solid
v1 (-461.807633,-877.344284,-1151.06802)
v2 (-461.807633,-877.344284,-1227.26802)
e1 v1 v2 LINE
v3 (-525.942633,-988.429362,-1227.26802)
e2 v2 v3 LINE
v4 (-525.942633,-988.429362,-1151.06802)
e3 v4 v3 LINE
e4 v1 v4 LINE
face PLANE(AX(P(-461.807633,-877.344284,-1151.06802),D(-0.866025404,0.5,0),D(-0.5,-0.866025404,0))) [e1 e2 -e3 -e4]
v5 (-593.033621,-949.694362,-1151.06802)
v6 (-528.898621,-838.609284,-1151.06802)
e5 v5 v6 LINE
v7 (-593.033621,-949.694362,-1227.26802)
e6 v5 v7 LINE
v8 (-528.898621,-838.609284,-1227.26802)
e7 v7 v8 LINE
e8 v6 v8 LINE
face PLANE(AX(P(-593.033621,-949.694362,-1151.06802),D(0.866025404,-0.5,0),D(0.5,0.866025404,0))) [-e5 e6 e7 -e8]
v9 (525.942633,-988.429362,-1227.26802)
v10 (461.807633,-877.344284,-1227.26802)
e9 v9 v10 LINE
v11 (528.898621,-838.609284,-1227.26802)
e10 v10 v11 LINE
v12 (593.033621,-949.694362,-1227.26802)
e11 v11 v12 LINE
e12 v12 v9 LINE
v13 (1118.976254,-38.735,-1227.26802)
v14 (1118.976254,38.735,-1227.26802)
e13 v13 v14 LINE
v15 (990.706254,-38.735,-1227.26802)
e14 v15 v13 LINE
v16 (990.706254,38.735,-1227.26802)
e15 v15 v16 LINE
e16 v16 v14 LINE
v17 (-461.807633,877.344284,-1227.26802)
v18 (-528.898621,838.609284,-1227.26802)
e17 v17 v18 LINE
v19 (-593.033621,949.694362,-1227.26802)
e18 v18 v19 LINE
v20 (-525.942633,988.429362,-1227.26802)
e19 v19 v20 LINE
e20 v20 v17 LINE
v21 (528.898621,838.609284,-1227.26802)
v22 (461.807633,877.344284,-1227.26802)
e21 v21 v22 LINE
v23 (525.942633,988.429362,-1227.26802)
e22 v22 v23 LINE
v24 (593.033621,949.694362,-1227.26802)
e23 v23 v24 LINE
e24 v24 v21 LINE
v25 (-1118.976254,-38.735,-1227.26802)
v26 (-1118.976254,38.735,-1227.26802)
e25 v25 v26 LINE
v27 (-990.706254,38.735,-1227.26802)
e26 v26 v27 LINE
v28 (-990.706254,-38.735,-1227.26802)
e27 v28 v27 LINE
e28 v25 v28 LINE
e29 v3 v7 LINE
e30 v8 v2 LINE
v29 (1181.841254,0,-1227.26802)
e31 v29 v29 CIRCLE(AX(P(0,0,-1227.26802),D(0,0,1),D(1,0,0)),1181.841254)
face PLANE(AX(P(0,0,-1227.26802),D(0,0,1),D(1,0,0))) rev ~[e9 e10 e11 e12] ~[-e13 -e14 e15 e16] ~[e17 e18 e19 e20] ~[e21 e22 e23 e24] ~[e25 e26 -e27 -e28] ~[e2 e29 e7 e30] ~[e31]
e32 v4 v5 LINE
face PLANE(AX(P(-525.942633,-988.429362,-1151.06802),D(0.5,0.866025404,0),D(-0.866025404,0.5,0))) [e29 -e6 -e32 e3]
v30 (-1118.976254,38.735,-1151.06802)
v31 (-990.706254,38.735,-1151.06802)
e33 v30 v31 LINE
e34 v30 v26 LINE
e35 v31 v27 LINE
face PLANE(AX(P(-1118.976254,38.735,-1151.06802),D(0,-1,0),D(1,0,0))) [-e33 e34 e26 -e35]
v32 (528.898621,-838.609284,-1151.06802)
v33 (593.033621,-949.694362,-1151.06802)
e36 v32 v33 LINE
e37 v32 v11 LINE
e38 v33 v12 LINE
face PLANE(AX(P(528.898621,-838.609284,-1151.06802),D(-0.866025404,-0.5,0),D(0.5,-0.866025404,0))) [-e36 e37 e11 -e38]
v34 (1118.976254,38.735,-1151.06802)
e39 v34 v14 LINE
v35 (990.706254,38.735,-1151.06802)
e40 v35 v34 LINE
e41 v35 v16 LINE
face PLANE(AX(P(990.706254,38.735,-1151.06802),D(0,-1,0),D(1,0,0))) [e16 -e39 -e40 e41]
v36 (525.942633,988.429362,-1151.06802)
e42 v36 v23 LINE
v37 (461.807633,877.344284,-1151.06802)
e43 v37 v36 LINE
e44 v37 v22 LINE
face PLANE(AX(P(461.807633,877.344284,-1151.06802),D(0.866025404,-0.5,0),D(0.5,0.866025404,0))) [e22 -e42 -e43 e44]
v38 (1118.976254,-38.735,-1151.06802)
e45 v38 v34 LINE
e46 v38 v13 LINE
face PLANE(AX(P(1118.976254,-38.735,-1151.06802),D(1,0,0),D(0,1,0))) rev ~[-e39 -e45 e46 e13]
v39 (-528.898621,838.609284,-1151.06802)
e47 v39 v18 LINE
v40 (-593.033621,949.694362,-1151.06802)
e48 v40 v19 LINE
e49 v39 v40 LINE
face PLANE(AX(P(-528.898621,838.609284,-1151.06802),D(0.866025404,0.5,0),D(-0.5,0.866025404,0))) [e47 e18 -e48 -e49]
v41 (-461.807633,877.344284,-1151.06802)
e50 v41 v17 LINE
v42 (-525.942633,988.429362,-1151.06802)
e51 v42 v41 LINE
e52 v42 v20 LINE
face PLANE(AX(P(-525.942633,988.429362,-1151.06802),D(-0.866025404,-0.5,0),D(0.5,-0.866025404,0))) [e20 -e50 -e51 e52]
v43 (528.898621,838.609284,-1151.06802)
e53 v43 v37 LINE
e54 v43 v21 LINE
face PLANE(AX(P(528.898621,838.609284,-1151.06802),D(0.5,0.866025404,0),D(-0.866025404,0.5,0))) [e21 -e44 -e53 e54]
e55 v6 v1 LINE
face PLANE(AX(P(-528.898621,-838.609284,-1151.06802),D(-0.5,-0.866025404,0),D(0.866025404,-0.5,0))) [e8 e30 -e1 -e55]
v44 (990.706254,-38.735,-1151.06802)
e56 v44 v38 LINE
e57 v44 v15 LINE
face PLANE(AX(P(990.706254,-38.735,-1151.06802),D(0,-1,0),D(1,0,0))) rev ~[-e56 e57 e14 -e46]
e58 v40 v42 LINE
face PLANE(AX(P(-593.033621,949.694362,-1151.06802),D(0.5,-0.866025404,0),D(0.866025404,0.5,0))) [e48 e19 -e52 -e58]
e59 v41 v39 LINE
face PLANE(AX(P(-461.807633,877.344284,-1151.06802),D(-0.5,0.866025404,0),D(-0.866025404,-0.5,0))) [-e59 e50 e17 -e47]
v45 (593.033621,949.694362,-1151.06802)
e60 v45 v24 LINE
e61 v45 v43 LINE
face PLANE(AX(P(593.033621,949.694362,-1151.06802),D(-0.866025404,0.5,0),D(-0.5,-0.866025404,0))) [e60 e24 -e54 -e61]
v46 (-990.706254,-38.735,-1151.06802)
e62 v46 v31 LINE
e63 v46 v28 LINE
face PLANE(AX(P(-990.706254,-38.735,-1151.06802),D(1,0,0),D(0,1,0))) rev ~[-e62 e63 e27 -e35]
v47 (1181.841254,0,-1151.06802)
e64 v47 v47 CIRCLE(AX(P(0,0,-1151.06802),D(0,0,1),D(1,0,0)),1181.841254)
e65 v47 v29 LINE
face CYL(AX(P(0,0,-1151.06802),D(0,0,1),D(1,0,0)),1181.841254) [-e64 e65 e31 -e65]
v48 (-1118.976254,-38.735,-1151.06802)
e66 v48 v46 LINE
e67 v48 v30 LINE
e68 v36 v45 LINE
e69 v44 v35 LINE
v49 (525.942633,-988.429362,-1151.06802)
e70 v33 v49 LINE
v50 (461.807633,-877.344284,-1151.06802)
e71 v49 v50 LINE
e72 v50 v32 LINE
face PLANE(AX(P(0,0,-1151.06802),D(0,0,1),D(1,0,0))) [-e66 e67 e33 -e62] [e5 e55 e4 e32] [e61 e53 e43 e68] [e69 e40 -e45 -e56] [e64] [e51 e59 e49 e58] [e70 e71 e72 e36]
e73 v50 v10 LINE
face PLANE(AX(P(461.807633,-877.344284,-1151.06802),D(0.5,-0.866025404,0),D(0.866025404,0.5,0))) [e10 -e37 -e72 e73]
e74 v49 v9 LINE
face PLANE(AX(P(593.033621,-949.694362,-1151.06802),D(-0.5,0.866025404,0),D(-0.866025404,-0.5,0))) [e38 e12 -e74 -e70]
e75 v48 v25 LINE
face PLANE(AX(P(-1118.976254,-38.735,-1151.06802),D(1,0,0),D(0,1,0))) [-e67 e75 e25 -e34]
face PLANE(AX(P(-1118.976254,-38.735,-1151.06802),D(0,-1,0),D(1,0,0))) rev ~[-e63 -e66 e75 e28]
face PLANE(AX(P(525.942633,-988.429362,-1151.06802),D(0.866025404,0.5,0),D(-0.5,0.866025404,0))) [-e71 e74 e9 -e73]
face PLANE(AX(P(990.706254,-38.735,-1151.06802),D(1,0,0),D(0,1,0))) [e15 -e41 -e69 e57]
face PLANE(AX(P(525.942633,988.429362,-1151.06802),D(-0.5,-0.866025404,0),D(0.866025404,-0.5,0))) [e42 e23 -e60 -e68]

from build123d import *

# Parameters (mm, degrees)
F2_R     = 1181.8412542343
F2_W     = 128.27
F2_H     = 77.47
F3_DEPTH = 76.2


with BuildPart() as f3:
    # F2 (on face) → F3 (new body)
    with BuildSketch(Plane.XY.offset(-1151.068019867)):
        Circle(F2_R)
        Polygon((-525.9426331016, -988.4293623985), (-593.0336211327, -949.6943623985), (-528.8986211327, -838.609283855), (-461.8076331016, -877.344283855), align=None, mode=Mode.SUBTRACT)
        Polygon((593.0336211327, -949.6943623985), (525.9426331016, -988.4293623985), (461.8076331016, -877.344283855), (528.8986211327, -838.609283855), align=None, mode=Mode.SUBTRACT)
        with Locations((-1054.8412542343, 0)):
            Rectangle(F2_W, F2_H, mode=Mode.SUBTRACT)
        Polygon((-593.0336211327, 949.6943623985), (-525.9426331016, 988.4293623985), (-461.8076331016, 877.344283855), (-528.8986211327, 838.609283855), align=None, mode=Mode.SUBTRACT)
        with Locations((1054.8412542343, 0)):
            Rectangle(F2_W, F2_H, mode=Mode.SUBTRACT)
        Polygon((525.9426331016, 988.4293623985), (593.0336211327, 949.6943623985), (528.8986211327, 838.609283855), (461.8076331016, 877.344283855), align=None, mode=Mode.SUBTRACT)
    extrude(amount=-F3_DEPTH)


solid = f3.part
